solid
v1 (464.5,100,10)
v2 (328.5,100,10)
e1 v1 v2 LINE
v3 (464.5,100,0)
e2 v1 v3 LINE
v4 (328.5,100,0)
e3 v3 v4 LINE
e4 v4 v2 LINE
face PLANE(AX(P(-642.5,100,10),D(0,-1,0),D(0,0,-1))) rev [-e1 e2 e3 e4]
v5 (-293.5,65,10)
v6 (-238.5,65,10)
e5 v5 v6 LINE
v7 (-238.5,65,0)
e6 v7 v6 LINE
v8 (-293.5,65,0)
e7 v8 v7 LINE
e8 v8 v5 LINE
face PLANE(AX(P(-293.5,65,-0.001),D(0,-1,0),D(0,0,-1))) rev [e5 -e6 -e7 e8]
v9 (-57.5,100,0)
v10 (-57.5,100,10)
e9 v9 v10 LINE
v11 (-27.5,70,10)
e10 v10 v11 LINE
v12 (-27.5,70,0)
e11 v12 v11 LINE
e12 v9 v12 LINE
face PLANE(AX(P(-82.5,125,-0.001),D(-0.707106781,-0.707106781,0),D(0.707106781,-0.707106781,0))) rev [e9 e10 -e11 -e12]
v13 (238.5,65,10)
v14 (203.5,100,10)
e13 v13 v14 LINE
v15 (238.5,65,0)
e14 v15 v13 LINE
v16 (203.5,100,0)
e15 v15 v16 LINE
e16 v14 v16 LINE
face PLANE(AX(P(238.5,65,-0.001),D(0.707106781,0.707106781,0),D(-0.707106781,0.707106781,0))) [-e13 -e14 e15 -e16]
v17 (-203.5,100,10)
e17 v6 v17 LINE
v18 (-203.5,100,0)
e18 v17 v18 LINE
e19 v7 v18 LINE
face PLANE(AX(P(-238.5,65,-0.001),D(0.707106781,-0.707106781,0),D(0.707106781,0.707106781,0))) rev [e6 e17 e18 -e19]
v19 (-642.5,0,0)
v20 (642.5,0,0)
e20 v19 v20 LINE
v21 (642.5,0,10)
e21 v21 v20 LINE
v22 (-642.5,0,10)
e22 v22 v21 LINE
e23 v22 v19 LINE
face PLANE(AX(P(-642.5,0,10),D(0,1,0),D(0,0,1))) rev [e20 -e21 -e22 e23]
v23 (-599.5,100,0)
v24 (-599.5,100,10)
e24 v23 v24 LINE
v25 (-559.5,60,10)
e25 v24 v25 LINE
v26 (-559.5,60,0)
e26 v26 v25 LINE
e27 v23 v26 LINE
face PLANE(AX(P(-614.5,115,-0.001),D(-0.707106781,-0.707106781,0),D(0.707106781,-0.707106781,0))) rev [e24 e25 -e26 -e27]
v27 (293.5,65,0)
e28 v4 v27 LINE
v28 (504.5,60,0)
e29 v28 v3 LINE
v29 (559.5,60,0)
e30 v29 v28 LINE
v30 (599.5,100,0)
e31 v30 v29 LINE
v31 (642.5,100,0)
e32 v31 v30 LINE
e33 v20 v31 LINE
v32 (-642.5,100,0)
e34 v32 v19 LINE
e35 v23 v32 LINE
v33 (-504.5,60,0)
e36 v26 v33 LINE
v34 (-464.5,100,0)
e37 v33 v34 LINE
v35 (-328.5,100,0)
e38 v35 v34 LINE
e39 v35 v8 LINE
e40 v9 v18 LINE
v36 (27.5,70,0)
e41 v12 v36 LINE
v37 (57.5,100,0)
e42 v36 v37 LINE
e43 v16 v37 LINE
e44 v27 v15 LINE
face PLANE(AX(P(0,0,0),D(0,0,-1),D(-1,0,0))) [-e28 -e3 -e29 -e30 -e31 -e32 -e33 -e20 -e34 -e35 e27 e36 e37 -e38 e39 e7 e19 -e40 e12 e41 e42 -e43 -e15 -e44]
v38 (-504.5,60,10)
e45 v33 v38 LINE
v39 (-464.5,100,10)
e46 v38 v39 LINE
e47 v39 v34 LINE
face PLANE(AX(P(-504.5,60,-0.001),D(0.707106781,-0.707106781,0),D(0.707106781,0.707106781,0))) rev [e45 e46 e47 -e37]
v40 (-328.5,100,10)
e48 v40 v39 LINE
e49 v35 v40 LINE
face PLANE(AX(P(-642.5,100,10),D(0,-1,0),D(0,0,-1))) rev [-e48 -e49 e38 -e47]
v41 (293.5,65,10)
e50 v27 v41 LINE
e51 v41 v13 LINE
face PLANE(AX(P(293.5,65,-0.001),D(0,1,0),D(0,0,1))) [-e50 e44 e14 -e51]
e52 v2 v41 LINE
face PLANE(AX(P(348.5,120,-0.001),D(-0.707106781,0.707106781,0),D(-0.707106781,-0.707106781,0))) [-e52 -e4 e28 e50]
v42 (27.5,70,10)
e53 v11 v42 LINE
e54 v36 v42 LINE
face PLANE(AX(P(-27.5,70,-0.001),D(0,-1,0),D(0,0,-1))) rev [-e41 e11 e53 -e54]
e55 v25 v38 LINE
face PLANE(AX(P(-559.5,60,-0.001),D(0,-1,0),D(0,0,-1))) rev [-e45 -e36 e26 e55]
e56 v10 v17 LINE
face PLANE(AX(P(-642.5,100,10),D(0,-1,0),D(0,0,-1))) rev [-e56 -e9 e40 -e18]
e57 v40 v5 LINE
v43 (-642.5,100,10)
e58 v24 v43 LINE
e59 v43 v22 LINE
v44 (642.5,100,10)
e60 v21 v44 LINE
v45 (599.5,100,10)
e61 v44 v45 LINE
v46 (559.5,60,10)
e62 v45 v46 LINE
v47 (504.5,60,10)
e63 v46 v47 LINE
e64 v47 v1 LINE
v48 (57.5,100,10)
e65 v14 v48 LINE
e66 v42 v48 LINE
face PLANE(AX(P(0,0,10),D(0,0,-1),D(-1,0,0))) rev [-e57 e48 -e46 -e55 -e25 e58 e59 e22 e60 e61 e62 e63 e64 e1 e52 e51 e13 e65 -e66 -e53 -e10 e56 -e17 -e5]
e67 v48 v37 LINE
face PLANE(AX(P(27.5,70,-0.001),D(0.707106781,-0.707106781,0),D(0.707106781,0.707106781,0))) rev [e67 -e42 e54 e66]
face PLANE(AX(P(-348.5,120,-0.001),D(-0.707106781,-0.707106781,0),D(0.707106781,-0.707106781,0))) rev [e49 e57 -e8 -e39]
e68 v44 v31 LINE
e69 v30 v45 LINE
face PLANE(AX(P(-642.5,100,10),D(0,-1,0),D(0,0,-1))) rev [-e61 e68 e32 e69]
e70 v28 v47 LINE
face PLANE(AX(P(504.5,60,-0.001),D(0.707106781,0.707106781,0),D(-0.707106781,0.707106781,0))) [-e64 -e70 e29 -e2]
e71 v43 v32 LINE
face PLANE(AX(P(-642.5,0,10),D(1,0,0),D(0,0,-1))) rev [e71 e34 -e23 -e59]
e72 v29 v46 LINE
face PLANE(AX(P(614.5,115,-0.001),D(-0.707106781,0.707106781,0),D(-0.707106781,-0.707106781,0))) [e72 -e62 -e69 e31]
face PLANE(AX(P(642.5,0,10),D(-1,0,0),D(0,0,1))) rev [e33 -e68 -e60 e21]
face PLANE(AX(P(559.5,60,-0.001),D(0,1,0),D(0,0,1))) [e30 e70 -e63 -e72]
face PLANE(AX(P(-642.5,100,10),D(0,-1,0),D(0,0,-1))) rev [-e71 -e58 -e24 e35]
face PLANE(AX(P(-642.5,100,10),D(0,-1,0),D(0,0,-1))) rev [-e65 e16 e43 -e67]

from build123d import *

# Parameters (mm, degrees)
SKETCH1_W             = 1285
SKETCH1_H             = 100
BOSS_EXTRUDE1_DEPTH   = 10
CUT_EXTRUDE1_REACH    = 652.312
SKETCH_PATTERN1_DEPTH = 10


# Read off the part's stored shape, not the designer's step: Sketch-Pattern1
with BuildPart() as part:
    # Sketch1 → Boss-Extrude1 (new body)
    with BuildSketch(Plane.XY):
        with Locations((0, 50)):
            Rectangle(SKETCH1_W, SKETCH1_H)
    extrude(amount=BOSS_EXTRUDE1_DEPTH)

    # Sketch2 → Cut-Extrude1 (cut, up to next)
    with BuildSketch(Plane.XY.offset(10), mode=Mode.PRIVATE) as cut_extrude1_sk1:
        Polygon((-82.5, 125), (-27.5, 70), (27.5, 70), (82.5, 125), align=None)
    cut_extrude1_tool1 = extrude(cut_extrude1_sk1.sketch, amount=-CUT_EXTRUDE1_REACH, mode=Mode.PRIVATE) & part.part
    add(cut_extrude1_tool1.solids().sort_by_distance((0, 102.083333, 10))[0], mode=Mode.SUBTRACT)

    # Sketch-Pattern1 outline → Sketch-Pattern1 (cut)
    with BuildSketch(Plane.XY):
        Polygon((-559.5, 60), (-504.5, 60), (-464.5, 100), (-599.5, 100), align=None)
        Polygon((-203.5, 100), (-328.5, 100), (-293.5, 65), (-238.5, 65), align=None)
    sketch_pattern1 = extrude(amount=SKETCH_PATTERN1_DEPTH, mode=Mode.SUBTRACT)

    # Mirror1: Sketch-Pattern1 across plane
    add(sketch_pattern1.mirror(Plane(origin=(0, 0, 0), x_dir=(0, 0, 1), z_dir=(1, 0, 0))), mode=Mode.SUBTRACT)


solid = part.part
